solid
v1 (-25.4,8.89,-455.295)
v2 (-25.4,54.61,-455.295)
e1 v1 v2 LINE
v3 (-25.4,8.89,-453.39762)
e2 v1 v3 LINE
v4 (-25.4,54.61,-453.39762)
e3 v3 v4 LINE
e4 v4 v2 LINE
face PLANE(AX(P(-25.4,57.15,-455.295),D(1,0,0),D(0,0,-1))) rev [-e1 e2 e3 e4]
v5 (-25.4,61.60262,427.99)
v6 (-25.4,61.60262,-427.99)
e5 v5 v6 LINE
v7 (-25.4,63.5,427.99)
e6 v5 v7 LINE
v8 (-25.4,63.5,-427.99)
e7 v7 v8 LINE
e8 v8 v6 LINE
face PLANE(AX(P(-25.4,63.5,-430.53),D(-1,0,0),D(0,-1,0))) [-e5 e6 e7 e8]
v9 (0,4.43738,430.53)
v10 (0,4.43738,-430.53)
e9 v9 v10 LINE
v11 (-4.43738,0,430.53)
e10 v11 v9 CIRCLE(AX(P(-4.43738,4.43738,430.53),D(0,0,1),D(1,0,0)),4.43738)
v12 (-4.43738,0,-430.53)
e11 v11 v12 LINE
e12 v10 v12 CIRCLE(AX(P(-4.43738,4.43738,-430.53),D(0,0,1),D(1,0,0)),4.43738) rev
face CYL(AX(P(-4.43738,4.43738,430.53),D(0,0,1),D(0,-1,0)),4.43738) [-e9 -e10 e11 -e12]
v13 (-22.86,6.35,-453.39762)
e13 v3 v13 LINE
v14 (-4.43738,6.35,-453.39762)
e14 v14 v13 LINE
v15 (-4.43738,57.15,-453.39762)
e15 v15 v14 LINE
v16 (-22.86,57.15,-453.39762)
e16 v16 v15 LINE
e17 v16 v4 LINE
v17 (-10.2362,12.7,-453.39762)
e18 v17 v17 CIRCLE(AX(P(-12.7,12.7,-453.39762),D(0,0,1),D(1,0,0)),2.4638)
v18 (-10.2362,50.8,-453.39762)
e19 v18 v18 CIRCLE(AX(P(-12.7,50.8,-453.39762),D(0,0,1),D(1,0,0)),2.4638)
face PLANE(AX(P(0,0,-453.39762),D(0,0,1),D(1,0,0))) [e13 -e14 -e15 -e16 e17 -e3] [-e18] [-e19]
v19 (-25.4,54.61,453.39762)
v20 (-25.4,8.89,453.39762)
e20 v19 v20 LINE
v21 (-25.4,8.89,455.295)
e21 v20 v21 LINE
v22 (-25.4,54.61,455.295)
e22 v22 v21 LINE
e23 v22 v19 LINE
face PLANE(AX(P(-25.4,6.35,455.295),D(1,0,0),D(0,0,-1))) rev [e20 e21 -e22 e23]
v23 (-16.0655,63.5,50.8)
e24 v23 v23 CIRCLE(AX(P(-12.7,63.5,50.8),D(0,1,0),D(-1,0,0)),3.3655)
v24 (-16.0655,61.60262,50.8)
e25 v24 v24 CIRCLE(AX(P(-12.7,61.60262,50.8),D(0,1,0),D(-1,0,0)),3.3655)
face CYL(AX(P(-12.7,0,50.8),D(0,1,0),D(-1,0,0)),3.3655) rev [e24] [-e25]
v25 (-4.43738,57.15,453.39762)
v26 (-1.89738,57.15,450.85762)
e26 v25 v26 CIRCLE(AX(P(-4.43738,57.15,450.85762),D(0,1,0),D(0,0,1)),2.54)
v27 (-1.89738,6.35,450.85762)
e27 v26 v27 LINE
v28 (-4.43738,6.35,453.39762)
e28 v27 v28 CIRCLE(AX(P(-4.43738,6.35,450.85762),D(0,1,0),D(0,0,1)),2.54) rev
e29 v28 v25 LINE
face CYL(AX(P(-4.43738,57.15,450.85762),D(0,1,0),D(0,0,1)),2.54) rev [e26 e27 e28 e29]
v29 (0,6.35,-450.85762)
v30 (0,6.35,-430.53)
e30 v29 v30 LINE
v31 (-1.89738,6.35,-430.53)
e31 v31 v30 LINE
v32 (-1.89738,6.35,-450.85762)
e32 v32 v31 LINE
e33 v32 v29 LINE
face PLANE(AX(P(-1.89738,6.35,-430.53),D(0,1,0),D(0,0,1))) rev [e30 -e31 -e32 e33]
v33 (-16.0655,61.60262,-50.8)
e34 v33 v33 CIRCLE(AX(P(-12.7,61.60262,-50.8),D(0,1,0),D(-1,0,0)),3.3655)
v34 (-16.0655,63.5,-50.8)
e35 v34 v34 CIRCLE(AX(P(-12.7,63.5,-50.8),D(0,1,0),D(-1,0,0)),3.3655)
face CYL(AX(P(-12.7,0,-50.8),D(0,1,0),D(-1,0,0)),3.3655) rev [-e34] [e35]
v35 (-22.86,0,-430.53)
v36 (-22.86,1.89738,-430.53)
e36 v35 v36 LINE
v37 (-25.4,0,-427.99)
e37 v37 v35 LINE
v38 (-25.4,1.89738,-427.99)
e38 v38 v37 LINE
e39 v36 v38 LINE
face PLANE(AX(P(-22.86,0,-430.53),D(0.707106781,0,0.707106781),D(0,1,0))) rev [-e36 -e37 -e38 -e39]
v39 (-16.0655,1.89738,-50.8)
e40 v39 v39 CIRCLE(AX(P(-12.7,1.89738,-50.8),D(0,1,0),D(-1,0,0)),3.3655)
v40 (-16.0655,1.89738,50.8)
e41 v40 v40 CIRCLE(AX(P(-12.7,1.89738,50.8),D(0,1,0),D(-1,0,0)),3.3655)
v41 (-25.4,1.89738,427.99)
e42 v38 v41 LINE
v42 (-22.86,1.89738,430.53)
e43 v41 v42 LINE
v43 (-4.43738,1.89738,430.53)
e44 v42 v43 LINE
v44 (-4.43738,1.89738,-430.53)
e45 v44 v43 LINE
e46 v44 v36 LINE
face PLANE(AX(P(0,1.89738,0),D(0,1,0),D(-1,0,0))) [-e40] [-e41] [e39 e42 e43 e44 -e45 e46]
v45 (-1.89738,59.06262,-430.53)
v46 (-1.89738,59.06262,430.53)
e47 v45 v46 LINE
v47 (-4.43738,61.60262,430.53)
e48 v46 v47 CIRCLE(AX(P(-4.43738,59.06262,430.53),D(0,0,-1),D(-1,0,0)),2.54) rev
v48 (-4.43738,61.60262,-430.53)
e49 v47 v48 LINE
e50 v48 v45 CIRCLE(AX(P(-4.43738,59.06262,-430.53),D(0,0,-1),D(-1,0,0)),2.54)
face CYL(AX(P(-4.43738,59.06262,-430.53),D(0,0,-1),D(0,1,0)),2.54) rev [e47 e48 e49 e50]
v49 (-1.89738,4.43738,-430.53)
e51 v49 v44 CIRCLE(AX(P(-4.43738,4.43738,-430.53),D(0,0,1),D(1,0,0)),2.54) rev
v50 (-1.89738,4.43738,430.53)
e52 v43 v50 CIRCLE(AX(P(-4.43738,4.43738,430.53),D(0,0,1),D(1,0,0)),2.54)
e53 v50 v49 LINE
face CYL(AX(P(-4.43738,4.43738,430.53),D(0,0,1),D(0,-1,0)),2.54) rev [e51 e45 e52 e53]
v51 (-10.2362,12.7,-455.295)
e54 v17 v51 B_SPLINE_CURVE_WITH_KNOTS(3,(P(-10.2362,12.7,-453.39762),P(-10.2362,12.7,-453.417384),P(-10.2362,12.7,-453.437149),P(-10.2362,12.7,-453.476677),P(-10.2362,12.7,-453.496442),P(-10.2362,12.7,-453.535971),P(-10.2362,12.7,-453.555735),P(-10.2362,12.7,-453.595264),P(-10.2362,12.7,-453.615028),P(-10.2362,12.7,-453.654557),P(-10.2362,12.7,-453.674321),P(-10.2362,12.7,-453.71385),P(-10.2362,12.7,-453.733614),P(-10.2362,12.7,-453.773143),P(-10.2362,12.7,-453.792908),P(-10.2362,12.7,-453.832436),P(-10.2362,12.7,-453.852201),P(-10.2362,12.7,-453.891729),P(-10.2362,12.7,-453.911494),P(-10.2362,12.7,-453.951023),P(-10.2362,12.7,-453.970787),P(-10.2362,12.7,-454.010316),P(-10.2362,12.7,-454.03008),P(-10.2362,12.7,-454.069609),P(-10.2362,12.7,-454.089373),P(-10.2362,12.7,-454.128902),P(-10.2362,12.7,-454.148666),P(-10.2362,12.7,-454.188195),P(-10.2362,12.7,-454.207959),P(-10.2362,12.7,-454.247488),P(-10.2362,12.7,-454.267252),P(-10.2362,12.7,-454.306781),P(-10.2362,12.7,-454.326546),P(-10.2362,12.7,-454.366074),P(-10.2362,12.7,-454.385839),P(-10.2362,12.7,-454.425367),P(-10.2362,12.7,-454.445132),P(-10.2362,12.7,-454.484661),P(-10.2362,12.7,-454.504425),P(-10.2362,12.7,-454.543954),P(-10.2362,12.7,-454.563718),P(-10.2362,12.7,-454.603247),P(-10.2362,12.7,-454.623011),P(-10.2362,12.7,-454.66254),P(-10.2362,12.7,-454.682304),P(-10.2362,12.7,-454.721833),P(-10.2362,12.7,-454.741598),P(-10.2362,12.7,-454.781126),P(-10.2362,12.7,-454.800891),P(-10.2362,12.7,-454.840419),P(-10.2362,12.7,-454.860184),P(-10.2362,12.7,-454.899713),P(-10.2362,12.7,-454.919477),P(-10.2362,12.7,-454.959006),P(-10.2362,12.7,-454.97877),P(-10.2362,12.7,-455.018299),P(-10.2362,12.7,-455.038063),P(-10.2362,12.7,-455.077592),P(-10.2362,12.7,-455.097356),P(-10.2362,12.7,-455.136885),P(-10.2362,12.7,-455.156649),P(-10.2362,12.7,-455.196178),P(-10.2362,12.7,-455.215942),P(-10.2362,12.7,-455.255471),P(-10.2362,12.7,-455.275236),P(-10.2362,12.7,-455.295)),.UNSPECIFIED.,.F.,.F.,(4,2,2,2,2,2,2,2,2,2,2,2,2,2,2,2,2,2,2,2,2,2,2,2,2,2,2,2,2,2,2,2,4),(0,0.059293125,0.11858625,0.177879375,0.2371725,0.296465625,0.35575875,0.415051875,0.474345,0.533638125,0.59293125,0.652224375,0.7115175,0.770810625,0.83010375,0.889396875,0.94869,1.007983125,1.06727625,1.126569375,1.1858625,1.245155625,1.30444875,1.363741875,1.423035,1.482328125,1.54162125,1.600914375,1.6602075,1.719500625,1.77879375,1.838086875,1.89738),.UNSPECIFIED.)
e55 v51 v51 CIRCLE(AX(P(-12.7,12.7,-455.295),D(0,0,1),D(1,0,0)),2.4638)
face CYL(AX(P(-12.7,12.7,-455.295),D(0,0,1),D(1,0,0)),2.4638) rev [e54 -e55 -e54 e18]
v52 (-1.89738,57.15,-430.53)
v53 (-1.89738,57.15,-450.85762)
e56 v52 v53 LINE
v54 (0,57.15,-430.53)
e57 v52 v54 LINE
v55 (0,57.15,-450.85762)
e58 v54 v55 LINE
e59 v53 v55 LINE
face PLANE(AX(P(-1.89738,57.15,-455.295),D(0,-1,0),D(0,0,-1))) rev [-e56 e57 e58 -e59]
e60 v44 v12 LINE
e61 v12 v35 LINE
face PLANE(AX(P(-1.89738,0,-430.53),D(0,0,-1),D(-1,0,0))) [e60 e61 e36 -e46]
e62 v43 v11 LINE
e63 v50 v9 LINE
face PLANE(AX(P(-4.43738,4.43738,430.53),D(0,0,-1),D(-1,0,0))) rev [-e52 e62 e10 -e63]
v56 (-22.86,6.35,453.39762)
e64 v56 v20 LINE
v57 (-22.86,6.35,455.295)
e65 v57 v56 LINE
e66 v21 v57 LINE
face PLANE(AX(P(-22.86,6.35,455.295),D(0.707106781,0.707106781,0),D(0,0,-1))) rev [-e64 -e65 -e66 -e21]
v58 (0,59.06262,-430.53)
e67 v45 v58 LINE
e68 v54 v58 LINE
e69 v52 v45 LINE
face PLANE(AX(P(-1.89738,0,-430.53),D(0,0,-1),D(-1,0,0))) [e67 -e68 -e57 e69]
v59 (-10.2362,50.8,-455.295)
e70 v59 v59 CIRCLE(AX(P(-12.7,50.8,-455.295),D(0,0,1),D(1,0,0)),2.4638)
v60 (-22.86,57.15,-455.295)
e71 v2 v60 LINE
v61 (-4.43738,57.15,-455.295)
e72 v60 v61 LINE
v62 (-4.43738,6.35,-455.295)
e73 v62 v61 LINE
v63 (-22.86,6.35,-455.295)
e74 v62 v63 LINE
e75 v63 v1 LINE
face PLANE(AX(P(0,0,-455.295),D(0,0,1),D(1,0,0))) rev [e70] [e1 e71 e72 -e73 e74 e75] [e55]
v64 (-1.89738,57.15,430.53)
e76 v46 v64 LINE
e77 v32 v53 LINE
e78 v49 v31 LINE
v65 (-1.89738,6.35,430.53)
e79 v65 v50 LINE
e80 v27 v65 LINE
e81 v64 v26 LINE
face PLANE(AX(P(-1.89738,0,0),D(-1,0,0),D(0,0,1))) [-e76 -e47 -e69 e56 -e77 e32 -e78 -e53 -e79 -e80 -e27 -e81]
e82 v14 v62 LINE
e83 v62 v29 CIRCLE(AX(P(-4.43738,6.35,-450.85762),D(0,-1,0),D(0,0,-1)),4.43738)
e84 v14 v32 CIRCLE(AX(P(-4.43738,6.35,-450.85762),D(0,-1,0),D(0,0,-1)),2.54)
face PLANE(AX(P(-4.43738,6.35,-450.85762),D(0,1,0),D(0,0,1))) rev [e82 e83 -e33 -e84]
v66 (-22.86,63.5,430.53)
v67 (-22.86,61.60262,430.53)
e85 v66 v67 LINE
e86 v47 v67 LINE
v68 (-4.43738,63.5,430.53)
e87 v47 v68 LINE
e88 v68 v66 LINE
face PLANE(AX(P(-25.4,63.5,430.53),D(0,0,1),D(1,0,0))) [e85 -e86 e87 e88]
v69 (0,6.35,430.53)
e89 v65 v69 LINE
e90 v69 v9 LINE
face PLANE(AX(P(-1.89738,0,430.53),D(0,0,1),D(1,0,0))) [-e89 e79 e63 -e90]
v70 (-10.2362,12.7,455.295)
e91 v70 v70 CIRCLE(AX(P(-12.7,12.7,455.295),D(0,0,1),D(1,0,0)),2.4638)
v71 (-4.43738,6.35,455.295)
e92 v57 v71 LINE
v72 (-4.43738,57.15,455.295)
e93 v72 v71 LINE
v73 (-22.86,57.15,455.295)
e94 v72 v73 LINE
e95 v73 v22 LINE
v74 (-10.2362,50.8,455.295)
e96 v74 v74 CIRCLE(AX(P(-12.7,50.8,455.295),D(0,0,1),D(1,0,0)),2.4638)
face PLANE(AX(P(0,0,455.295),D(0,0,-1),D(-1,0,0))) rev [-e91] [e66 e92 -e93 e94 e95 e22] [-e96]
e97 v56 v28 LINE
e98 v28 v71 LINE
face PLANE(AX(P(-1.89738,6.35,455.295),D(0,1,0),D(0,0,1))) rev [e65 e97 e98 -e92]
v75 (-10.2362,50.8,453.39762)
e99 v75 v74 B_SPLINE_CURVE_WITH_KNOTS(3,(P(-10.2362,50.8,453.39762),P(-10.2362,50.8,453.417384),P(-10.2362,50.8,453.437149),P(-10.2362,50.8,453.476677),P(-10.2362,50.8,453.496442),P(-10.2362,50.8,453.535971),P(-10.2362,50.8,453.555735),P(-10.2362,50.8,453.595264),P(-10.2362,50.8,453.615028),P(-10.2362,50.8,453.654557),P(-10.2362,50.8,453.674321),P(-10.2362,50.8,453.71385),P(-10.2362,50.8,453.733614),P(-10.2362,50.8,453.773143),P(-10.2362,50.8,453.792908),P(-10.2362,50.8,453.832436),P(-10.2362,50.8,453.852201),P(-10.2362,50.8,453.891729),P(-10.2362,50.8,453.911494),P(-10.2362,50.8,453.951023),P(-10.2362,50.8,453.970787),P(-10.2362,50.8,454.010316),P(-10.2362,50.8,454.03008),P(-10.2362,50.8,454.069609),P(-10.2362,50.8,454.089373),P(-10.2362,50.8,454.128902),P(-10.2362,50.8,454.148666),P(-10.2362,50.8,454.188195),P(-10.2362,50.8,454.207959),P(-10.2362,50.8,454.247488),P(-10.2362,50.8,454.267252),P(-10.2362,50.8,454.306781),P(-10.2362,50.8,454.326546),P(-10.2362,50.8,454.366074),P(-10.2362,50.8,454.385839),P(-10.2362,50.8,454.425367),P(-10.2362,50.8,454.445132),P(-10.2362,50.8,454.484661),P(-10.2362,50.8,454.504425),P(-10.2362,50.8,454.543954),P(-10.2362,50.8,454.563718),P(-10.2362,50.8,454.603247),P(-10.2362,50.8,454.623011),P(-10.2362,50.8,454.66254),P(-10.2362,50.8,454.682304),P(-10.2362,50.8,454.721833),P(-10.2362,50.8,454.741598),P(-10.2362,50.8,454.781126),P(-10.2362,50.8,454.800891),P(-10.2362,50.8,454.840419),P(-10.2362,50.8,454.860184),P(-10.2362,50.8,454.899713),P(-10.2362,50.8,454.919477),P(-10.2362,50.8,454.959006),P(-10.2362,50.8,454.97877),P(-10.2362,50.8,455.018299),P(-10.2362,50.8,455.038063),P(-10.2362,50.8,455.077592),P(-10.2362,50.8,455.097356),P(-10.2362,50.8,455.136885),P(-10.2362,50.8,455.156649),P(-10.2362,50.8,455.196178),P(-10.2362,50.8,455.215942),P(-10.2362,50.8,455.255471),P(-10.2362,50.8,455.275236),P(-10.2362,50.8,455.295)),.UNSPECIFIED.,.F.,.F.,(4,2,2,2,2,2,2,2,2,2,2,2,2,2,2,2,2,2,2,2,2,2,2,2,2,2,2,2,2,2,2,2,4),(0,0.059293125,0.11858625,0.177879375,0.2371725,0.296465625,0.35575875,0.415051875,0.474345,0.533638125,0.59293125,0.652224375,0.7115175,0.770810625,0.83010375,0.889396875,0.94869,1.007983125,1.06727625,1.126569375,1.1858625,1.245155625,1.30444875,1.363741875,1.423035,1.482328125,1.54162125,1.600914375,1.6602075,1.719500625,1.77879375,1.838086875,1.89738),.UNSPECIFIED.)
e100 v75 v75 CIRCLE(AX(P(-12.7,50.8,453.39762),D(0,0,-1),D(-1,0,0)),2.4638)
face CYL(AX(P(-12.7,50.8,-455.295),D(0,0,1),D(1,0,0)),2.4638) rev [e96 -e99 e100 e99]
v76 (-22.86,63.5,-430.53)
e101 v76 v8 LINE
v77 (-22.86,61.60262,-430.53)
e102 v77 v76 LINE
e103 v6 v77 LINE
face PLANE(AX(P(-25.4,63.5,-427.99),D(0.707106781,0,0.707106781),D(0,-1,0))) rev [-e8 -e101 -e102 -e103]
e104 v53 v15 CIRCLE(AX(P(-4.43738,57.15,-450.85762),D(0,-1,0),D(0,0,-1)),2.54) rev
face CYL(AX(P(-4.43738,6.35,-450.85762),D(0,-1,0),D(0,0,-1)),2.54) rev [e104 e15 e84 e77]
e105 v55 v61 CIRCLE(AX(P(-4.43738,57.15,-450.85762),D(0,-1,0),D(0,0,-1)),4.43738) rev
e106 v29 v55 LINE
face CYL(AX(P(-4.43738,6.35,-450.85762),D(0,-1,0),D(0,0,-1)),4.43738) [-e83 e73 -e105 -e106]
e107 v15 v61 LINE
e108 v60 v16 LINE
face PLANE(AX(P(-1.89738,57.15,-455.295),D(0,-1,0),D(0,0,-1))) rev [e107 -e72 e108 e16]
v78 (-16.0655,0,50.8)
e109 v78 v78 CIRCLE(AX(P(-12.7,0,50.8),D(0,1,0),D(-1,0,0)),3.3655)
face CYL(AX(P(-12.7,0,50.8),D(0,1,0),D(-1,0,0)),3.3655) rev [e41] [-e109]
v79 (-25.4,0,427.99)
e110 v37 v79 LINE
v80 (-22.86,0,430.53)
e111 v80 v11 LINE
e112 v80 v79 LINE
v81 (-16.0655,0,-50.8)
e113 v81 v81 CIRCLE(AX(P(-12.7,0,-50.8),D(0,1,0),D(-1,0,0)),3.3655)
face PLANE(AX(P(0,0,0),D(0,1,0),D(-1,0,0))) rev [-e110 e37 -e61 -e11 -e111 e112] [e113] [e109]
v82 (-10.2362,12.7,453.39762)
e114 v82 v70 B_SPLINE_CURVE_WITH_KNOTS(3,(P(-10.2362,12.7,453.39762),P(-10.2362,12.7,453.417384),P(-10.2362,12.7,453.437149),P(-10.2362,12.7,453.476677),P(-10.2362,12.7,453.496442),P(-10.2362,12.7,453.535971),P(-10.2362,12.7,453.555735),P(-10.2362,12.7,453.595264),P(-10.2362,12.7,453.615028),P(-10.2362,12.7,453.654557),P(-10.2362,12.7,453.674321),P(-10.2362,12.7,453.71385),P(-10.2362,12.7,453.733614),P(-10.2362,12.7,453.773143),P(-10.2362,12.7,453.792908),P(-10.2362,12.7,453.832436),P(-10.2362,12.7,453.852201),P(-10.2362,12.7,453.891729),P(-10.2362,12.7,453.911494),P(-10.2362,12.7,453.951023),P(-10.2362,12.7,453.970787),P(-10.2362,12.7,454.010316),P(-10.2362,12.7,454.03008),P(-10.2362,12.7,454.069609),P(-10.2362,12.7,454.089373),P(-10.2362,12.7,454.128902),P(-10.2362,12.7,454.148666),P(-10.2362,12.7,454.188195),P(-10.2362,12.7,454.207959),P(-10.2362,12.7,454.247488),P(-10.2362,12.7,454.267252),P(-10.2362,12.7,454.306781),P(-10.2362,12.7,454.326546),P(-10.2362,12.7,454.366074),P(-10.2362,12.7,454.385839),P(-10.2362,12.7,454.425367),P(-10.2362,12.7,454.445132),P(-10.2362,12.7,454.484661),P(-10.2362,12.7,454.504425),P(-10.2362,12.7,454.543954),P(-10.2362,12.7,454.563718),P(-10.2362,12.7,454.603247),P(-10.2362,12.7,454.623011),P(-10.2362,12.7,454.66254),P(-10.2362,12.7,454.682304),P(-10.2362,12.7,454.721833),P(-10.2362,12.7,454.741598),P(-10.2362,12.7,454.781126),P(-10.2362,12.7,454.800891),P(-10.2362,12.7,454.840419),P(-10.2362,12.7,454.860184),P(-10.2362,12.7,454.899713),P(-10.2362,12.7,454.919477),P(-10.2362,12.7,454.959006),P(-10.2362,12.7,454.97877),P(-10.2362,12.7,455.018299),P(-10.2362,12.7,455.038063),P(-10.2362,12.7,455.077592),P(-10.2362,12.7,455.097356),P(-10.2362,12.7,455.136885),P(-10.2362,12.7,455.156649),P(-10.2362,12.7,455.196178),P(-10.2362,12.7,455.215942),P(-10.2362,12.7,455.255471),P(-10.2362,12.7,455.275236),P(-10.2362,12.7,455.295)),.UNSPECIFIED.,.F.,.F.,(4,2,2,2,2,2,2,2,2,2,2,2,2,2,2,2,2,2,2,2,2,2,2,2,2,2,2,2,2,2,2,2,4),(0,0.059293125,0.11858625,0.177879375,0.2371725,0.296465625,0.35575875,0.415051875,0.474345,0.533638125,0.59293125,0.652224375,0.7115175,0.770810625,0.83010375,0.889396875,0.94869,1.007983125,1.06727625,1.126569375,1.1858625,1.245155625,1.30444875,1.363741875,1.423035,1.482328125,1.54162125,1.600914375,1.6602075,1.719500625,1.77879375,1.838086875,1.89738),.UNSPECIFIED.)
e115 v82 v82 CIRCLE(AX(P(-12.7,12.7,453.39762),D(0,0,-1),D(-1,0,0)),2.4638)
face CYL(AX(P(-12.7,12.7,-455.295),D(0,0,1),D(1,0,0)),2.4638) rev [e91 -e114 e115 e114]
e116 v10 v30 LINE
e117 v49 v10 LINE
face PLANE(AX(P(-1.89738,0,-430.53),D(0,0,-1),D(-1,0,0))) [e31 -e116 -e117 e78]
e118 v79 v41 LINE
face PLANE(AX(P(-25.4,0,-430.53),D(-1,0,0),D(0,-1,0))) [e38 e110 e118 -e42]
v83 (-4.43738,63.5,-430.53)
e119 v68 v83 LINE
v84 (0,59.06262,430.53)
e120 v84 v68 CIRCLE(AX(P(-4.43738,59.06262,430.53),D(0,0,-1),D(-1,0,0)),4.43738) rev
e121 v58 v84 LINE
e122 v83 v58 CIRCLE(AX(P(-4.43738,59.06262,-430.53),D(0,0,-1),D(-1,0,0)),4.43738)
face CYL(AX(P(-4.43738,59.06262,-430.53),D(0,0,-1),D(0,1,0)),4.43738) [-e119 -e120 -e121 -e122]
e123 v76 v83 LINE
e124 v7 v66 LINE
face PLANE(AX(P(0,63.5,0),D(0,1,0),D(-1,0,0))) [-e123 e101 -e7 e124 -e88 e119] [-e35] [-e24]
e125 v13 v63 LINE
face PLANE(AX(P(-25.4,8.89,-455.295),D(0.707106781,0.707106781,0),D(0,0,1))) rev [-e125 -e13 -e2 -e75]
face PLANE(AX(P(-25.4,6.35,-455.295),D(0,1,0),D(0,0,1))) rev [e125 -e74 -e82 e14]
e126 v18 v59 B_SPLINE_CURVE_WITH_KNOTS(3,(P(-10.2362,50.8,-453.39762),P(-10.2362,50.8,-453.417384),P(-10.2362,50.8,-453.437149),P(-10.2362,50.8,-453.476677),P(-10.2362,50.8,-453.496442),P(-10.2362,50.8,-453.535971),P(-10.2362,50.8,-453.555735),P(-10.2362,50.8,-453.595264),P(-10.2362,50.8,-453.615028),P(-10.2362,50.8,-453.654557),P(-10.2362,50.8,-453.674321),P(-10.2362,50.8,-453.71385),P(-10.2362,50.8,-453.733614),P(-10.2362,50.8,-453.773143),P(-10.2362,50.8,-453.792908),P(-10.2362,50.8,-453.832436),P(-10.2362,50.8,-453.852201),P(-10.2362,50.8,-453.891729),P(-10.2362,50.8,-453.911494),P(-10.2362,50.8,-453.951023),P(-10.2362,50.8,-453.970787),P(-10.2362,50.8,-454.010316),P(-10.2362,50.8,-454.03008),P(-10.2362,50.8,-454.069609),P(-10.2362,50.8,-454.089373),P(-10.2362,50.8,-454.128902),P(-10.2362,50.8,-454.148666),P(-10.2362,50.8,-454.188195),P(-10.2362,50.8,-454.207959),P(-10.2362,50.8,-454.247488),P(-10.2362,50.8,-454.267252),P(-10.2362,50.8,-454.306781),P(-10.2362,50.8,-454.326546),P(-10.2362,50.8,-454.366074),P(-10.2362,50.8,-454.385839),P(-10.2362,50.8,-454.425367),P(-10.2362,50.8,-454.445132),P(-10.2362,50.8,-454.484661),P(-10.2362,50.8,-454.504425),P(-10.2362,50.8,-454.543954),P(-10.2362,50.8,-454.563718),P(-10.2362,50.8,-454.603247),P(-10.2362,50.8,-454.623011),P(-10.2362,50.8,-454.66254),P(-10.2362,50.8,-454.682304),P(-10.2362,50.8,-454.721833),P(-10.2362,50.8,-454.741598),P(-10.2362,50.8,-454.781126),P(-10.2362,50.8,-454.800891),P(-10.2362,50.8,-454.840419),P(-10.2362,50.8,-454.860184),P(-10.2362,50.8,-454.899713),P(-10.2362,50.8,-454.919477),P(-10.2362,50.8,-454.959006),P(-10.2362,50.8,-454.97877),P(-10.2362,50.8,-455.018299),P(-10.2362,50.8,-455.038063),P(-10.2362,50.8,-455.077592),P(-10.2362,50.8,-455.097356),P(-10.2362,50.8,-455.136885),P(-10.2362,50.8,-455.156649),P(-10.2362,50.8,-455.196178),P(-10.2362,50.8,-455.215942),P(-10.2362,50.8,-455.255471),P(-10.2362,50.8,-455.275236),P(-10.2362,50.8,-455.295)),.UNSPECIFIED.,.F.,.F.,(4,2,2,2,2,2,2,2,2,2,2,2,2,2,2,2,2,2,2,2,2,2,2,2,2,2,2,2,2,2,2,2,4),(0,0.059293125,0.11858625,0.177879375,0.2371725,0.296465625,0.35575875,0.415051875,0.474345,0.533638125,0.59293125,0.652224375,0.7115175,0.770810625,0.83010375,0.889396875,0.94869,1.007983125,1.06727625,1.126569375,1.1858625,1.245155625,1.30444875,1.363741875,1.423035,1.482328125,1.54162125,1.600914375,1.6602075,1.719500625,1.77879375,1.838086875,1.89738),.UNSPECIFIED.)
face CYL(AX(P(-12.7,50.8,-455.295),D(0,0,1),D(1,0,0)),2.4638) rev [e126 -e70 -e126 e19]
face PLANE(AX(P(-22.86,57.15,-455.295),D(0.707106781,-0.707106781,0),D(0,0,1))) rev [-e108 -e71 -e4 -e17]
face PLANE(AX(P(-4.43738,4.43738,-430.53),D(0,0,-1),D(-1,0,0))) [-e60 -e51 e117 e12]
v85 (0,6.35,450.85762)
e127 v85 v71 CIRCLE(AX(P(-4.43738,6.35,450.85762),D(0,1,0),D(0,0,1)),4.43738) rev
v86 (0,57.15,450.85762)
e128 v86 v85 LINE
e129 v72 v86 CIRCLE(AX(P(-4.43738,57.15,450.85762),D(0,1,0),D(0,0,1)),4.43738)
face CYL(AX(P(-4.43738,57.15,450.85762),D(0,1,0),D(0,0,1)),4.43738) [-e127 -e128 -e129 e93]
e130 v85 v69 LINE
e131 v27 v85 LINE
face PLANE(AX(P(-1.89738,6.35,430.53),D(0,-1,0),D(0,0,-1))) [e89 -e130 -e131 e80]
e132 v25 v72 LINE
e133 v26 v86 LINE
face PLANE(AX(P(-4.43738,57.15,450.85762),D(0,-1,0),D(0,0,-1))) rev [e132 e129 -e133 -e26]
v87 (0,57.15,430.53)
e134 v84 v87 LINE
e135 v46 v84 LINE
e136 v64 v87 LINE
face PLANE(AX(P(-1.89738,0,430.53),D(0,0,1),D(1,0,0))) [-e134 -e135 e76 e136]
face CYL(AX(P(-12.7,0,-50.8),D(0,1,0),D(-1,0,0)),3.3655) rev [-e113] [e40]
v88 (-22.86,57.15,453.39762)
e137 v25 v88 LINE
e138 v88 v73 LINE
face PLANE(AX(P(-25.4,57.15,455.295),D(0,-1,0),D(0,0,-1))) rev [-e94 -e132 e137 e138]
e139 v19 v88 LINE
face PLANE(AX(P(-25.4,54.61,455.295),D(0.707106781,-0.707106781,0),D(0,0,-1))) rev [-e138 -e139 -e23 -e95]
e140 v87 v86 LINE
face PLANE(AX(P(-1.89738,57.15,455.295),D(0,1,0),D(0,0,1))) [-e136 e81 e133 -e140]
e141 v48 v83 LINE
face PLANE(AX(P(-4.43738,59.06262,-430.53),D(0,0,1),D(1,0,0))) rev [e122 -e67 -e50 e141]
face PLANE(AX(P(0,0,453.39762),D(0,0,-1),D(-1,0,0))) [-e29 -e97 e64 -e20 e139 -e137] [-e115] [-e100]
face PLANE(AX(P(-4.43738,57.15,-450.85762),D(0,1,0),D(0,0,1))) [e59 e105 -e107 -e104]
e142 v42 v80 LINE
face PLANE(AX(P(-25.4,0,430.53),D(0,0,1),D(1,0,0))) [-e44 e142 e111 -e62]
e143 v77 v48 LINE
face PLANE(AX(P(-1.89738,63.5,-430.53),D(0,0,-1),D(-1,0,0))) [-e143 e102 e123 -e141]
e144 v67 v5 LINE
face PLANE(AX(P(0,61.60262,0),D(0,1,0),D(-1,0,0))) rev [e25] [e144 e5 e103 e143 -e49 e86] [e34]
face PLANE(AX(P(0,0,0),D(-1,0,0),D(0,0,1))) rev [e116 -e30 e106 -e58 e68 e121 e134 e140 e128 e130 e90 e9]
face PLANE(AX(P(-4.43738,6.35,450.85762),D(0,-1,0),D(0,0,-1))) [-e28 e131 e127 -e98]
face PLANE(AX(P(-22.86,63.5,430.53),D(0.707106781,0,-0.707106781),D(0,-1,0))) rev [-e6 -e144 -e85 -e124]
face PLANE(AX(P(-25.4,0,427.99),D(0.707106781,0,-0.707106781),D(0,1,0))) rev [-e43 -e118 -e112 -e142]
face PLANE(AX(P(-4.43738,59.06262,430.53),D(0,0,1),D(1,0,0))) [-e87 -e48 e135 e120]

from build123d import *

# Parameters (mm, degrees)
SKETCH1_W                      = 861.06
SKETCH1_H                      = 63.5
BASE_FLANGE1_DEPTH             = 1.89738
EDGE_FLANGE1_STRIP_W           = 12.66952
EDGE_FLANGE1_STRIP_H           = 1.89738
EDGE_FLANGE1_STRIP_CUT_DEPTH   = 861.06
EDGE_FLANGE1_STRIP_2_W         = 12.66952
EDGE_FLANGE1_STRIP_2_H         = 1.89738
EDGE_FLANGE1_STRIP_CUT_2_DEPTH = 861.06
EDGE_FLANGE1_DEPTH             = 861.06
EDGE_FLANGE1_BEND_DEPTH        = 861.06
SKETCH12_W                     = 24.765
SKETCH12_H                     = 50.8
BOSS_EXTRUDE1_DEPTH            = 1.89738
SKETCH13_R                     = 3.3655
CUT_EXTRUDE1_DEPTH             = 461.403026733
EDGE_FLANGE2_STRIP_W           = 12.66952
EDGE_FLANGE2_STRIP_H           = 1.89738
EDGE_FLANGE2_STRIP_CUT_DEPTH   = 50.8
EDGE_FLANGE2_STRIP_2_W         = 12.66952
EDGE_FLANGE2_STRIP_2_H         = 1.89738
EDGE_FLANGE2_STRIP_CUT_2_DEPTH = 50.8
EDGE_FLANGE2_DEPTH             = 50.8
EDGE_FLANGE2_BEND_DEPTH        = 50.8
SKETCH20_R                     = 2.4638
CUT_EXTRUDE2_DEPTH             = 914.154728455
CHAMFER1_SIZE                  = 2.54


# Sheet-metal steps are written as plain solids
with BuildPart() as part:
    # Sketch1 → Base-Flange1 (new body)
    with BuildSketch(Plane(origin=(0, 0, 0), x_dir=(0, 0, -1), z_dir=(1, 0, 0))):
        with Locations((0, 31.75)):
            Rectangle(SKETCH1_W, SKETCH1_H)
    extrude(amount=-BASE_FLANGE1_DEPTH)

    # Edge-Flange1 strip (across the edge) → Edge-Flange1 strip cut (cut)
    with BuildSketch(Plane(origin=(-1.89738, 63.5, 430.53), x_dir=(0, -1, 0), z_dir=(0, 0, -1))):
        with Locations((-1.89738, -0.94869)):
            Rectangle(EDGE_FLANGE1_STRIP_W, EDGE_FLANGE1_STRIP_H)
    extrude(amount=EDGE_FLANGE1_STRIP_CUT_DEPTH, mode=Mode.SUBTRACT)

    # Edge-Flange1 strip 2 (across the edge) → Edge-Flange1 strip cut 2 (cut)
    with BuildSketch(Plane(origin=(-1.89738, 0, -430.53), x_dir=(0, 1, 0), z_dir=(0, 0, 1))):
        with Locations((-1.89738, -0.94869)):
            Rectangle(EDGE_FLANGE1_STRIP_2_W, EDGE_FLANGE1_STRIP_2_H)
    extrude(amount=EDGE_FLANGE1_STRIP_CUT_2_DEPTH, mode=Mode.SUBTRACT)

    # Edge-Flange1 section (across the edge) → Edge-Flange1 (add)
    with BuildSketch(Plane(origin=(-1.89738, 63.5, 430.53), x_dir=(0, -1, 0), z_dir=(0, 0, -1))):
        with BuildLine():
            Line((0, 2.54), (0, 23.50262))
            Line((0, 23.50262), (1.89738, 23.50262))
            Line((1.89738, 23.50262), (1.89738, 2.54))
            ThreePointArc((1.89738, 2.54), (2.641328776, 0.743948776), (4.43738, 0))
            Line((4.43738, 0), (4.43738, -1.89738))
            ThreePointArc((4.43738, -1.89738), (1.299678511, -0.597701489), (0, 2.54))
        make_face()
    extrude(amount=EDGE_FLANGE1_DEPTH)

    # Edge-Flange1 section 2 (across the edge) → Edge-Flange1 bend (add)
    with BuildSketch(Plane(origin=(-1.89738, 0, -430.53), x_dir=(0, 1, 0), z_dir=(0, 0, 1))):
        with BuildLine():
            Line((0, 2.54), (0, 23.50262))
            Line((0, 23.50262), (1.89738, 23.50262))
            Line((1.89738, 23.50262), (1.89738, 2.54))
            ThreePointArc((1.89738, 2.54), (2.641328776, 0.743948776), (4.43738, 0))
            Line((4.43738, 0), (4.43738, -1.89738))
            ThreePointArc((4.43738, -1.89738), (1.299678511, -0.597701489), (0, 2.54))
        make_face()
    extrude(amount=EDGE_FLANGE1_BEND_DEPTH)

    # Sketch12 → Boss-Extrude1 (add)
    with BuildSketch(Plane(origin=(0, 0, 0), x_dir=(0, 0, -1), z_dir=(1, 0, 0))):
        with Locations((-442.9125, 31.75)):
            Rectangle(SKETCH12_W, SKETCH12_H)
    boss_extrude1 = extrude(amount=-BOSS_EXTRUDE1_DEPTH)

    # Mirror1: Boss-Extrude1 across plane
    add(boss_extrude1.mirror(Plane.XY))

    # Sketch13 → Cut-Extrude1 (cut, through all)
    with BuildSketch(Plane(origin=(0, 63.5, 0), x_dir=(1, 0, 0), z_dir=(0, 1, 0))):
        with Locations(Location((-12.7, 50.8, 0), (0, 0, 180))):
            Circle(SKETCH13_R)
        with Locations(Location((-12.7, -50.8, 0), (0, 0, 180))):
            Circle(SKETCH13_R)
    extrude(amount=-CUT_EXTRUDE1_DEPTH, mode=Mode.SUBTRACT)

    # Edge-Flange2 strip (across the edge) → Edge-Flange2 strip cut (cut)
    with BuildSketch(Plane(origin=(-1.89738, 6.35, 455.295), x_dir=(0, 0, -1), z_dir=(0, 1, 0))):
        with Locations((-1.89738, -0.94869)):
            Rectangle(EDGE_FLANGE2_STRIP_W, EDGE_FLANGE2_STRIP_H)
    extrude(amount=EDGE_FLANGE2_STRIP_CUT_DEPTH, mode=Mode.SUBTRACT)

    # Edge-Flange2 strip 2 (across the edge) → Edge-Flange2 strip cut 2 (cut)
    with BuildSketch(Plane(origin=(-1.89738, 57.15, -455.295), x_dir=(0, 0, 1), z_dir=(0, -1, 0))):
        with Locations((-1.89738, -0.94869)):
            Rectangle(EDGE_FLANGE2_STRIP_2_W, EDGE_FLANGE2_STRIP_2_H)
    extrude(amount=EDGE_FLANGE2_STRIP_CUT_2_DEPTH, mode=Mode.SUBTRACT)

    # Edge-Flange2 section (across the edge) → Edge-Flange2 (add)
    with BuildSketch(Plane(origin=(-1.89738, 6.35, 455.295), x_dir=(0, 0, -1), z_dir=(0, 1, 0))):
        with BuildLine():
            Line((0, 2.54), (0, 23.50262))
            Line((0, 23.50262), (1.89738, 23.50262))
            Line((1.89738, 23.50262), (1.89738, 2.54))
            ThreePointArc((1.89738, 2.54), (2.641328776, 0.743948776), (4.43738, 0))
            Line((4.43738, 0), (4.43738, -1.89738))
            ThreePointArc((4.43738, -1.89738), (1.299678511, -0.597701489), (0, 2.54))
        make_face()
    extrude(amount=EDGE_FLANGE2_DEPTH)

    # Edge-Flange2 section 2 (across the edge) → Edge-Flange2 bend (add)
    with BuildSketch(Plane(origin=(-1.89738, 57.15, -455.295), x_dir=(0, 0, 1), z_dir=(0, -1, 0))):
        with BuildLine():
            Line((0, 2.54), (0, 23.50262))
            Line((0, 23.50262), (1.89738, 23.50262))
            Line((1.89738, 23.50262), (1.89738, 2.54))
            ThreePointArc((1.89738, 2.54), (2.641328776, 0.743948776), (4.43738, 0))
            Line((4.43738, 0), (4.43738, -1.89738))
            ThreePointArc((4.43738, -1.89738), (1.299678511, -0.597701489), (0, 2.54))
        make_face()
    extrude(amount=EDGE_FLANGE2_BEND_DEPTH)

    # Sketch20 → Cut-Extrude2 (cut, through all)
    with BuildSketch(Plane.XY.offset(455.295)):
        with Locations((-12.7, 50.8)):
            Circle(SKETCH20_R)
        with Locations((-12.7, 12.7)):
            Circle(SKETCH20_R)
    extrude(amount=-CUT_EXTRUDE2_DEPTH, mode=Mode.SUBTRACT)

    # Chamfer1
    chamfer1_edges = [part.edges().sort_by_distance(p)[0] for p in [
        (-25.4, 6.35, 454.34631),
        (-25.4, 57.15, 454.34631),
        (-25.4, 57.15, -454.34631),
        (-25.4, 6.35, -454.34631),
        (-25.4, 62.55131, 430.53),
        (-25.4, 62.55131, -430.53),
        (-25.4, 0.94869, -430.53),
        (-25.4, 0.94869, 430.53),
    ]]
    chamfer(chamfer1_edges, length=CHAMFER1_SIZE)


solid = part.part
